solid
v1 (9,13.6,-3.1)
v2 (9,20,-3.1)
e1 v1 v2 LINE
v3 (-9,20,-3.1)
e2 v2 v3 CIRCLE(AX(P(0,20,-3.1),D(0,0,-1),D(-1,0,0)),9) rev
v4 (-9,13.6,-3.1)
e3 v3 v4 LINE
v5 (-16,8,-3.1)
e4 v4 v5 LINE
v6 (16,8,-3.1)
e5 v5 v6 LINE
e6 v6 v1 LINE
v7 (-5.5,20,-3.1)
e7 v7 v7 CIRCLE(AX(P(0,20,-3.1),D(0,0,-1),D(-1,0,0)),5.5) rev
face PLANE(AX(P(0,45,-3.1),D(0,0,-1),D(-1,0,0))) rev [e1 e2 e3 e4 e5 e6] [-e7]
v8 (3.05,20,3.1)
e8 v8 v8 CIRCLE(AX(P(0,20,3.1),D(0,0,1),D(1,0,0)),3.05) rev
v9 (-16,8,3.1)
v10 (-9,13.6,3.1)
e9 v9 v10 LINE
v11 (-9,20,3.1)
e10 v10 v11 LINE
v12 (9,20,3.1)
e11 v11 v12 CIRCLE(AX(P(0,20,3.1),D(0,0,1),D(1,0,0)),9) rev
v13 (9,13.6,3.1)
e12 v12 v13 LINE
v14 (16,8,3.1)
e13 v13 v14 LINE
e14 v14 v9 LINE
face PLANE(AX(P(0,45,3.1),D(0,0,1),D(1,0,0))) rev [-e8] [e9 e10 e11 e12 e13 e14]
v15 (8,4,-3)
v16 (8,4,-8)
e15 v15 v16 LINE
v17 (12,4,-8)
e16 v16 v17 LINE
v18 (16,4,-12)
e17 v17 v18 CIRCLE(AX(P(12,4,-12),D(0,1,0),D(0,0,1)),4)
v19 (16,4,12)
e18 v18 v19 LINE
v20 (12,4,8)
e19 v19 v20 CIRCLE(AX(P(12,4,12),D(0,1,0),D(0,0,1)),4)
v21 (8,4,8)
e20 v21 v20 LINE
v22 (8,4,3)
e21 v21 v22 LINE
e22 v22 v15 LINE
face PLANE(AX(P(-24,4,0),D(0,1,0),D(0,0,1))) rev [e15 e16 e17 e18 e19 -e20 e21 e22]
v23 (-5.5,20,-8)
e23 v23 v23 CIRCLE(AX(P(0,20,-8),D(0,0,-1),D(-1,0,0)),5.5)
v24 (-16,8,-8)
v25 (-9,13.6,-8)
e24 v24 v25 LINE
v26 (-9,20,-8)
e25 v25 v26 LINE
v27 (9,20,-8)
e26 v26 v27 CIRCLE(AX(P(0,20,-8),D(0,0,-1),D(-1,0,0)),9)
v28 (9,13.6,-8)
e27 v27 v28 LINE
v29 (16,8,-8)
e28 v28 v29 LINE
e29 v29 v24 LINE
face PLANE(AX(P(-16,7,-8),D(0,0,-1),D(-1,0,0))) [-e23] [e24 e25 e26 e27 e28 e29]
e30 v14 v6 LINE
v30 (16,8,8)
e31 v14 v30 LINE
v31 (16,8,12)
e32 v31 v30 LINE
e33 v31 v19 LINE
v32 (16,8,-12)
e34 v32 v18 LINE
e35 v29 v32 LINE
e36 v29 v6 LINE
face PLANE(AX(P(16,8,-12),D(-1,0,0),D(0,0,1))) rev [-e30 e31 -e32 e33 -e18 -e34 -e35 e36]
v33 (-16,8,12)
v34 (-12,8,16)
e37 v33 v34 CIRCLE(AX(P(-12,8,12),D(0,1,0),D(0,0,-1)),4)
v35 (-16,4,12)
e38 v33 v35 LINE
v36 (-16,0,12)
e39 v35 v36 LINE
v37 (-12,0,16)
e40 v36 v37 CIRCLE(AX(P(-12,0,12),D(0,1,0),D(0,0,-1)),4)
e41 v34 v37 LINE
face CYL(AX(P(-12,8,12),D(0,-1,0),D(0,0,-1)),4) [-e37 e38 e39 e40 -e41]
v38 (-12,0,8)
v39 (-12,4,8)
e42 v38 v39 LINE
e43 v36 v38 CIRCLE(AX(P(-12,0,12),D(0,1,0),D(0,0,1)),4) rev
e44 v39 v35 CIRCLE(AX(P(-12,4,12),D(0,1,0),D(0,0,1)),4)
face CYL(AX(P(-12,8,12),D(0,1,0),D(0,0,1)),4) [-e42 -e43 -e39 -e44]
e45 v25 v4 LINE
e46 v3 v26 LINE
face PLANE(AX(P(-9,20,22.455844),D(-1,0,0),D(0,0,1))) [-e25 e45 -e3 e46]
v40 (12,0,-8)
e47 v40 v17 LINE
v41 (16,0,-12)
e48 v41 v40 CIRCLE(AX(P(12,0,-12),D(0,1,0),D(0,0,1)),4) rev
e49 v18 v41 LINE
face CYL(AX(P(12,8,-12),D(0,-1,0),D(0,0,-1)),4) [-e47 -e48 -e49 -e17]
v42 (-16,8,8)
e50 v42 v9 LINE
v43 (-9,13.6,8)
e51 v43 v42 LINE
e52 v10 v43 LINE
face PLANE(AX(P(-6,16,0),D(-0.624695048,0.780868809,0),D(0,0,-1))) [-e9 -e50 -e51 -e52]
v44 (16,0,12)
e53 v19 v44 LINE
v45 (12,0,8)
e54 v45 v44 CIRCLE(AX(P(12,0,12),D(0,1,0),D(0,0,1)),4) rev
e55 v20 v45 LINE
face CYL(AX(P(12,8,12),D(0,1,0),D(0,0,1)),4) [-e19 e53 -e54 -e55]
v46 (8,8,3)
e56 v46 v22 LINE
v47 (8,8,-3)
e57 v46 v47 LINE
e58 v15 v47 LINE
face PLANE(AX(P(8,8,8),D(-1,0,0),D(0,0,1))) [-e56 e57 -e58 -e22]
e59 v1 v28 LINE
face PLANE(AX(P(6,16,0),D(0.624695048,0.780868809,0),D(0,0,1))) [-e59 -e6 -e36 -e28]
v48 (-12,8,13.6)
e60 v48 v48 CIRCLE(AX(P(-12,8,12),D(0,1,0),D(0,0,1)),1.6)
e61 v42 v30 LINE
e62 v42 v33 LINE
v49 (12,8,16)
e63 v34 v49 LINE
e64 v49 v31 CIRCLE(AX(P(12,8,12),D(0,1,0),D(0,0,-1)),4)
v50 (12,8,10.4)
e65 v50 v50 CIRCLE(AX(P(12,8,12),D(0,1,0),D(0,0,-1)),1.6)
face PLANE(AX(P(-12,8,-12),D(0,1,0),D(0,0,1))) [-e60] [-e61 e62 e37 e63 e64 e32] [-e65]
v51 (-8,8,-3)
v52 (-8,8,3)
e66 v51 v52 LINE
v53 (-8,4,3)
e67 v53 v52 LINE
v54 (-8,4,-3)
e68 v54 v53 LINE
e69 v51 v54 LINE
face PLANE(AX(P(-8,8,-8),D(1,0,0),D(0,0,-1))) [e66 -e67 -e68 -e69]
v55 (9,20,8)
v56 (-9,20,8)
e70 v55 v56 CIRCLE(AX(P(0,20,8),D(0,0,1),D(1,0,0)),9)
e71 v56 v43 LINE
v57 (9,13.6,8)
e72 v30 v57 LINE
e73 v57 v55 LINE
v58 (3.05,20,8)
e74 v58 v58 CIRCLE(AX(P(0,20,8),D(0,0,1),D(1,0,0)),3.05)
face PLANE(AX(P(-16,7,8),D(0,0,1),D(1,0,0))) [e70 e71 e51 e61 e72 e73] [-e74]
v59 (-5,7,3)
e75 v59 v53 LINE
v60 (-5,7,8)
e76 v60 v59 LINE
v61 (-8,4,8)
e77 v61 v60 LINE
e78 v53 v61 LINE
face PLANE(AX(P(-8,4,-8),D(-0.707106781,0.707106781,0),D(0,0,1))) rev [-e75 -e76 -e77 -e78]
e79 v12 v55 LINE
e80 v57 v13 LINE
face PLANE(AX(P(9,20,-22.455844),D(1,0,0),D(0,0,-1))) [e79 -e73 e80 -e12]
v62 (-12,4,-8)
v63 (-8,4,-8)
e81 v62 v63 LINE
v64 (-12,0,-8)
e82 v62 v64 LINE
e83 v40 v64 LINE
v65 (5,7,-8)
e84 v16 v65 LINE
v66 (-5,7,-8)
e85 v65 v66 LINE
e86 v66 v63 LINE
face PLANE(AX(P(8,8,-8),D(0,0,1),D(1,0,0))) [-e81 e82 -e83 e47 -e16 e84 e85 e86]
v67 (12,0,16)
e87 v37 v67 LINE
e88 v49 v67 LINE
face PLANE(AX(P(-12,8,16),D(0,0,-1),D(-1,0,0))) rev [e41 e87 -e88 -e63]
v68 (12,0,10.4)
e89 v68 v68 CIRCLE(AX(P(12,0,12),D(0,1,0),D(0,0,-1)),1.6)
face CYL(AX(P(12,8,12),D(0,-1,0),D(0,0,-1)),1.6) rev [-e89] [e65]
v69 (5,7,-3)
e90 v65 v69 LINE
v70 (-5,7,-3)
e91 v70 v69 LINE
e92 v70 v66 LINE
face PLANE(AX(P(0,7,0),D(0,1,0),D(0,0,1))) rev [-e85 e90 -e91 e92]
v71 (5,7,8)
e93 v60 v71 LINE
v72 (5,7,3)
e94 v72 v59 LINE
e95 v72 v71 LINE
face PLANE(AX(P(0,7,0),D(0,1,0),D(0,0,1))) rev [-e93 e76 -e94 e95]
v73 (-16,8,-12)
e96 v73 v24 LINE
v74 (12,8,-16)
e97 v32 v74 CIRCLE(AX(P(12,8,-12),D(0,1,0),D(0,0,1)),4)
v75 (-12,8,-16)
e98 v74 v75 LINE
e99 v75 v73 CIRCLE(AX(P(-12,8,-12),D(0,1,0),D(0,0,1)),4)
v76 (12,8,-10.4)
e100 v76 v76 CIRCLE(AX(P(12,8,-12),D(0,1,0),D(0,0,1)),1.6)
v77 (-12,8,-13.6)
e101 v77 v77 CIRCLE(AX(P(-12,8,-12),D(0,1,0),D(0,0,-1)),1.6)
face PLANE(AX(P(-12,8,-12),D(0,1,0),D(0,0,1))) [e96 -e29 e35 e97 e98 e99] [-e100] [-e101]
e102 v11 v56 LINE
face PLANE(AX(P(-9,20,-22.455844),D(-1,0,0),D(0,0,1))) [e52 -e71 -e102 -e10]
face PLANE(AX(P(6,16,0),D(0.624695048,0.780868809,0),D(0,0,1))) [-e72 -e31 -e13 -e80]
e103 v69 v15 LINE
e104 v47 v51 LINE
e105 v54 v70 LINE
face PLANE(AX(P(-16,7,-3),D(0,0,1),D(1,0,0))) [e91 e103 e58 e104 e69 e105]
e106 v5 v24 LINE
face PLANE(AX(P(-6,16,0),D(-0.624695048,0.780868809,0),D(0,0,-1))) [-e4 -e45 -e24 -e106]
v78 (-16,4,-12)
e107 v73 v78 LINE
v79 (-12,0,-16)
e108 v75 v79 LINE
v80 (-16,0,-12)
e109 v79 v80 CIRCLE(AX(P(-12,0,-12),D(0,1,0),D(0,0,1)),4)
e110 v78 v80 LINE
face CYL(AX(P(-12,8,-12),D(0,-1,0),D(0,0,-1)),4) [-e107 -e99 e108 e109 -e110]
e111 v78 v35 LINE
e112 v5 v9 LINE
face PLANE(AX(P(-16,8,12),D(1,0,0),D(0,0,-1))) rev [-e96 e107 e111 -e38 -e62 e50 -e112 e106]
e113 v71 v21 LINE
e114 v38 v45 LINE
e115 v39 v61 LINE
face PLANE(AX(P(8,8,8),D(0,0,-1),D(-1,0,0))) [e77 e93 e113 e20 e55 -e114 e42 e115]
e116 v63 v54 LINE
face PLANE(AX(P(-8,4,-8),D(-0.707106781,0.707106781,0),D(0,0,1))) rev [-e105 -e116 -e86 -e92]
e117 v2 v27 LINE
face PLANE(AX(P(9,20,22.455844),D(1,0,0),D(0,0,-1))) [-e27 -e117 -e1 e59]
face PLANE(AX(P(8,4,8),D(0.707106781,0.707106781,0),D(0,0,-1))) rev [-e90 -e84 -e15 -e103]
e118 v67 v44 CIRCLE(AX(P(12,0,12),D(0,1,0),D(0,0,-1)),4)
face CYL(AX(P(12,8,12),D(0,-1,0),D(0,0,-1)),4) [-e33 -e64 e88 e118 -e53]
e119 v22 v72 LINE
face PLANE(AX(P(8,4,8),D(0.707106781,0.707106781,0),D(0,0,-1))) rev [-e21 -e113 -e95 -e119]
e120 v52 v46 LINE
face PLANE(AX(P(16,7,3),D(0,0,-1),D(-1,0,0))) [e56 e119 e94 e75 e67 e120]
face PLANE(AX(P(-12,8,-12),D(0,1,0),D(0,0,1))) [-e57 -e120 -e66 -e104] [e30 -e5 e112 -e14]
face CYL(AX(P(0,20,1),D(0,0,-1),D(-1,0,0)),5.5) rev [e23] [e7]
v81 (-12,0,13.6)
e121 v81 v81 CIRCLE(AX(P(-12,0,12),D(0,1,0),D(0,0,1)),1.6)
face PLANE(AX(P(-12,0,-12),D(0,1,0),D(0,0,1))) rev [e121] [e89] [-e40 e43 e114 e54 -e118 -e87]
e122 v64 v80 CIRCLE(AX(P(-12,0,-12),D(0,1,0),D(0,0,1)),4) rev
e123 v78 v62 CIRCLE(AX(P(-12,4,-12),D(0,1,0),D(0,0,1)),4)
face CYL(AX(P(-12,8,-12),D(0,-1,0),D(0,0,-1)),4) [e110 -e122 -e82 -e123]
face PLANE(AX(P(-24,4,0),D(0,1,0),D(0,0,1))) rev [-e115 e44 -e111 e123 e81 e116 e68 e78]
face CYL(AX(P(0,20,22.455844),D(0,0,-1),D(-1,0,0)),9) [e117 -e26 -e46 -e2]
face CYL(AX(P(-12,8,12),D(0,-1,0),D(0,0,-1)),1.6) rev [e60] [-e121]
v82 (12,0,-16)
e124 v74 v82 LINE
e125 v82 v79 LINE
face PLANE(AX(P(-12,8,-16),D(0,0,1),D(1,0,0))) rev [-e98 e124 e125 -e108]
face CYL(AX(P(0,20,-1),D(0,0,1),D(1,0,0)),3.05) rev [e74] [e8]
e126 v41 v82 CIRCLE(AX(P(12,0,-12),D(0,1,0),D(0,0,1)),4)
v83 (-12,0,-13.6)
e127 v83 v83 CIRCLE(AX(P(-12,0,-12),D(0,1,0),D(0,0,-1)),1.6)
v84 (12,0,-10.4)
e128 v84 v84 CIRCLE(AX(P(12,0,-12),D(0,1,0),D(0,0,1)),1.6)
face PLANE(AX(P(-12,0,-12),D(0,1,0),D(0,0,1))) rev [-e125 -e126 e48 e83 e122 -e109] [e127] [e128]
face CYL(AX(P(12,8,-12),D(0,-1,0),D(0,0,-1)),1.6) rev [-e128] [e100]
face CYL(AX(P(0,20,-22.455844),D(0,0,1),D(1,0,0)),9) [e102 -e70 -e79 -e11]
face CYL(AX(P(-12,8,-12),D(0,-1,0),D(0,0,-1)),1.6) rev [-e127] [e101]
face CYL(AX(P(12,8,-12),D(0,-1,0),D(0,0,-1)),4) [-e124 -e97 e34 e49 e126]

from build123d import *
from OCP.BRepFilletAPI import BRepFilletAPI_MakeChamfer

# Parameters (mm, degrees)
SKETCH1_R                = 1.6
SKETCH1_W                = 16
SKETCH1_H                = 16
BOSS_EXTRUDE1_DEPTH      = 8
SKETCH2_W                = 16
SKETCH2_H                = 4
CUT_EXTRUDE1_DEPTH       = 40
FILLET1_R                = 4
BOSS_EXTRUDE5_DEPTH      = 8
BOSS_EXTRUDE5_DEPTH_BACK = 1
SKETCH3_W                = 32
SKETCH3_H                = 5
CHAMFER1_SIZE            = 3
CHAMFER2_SIZE            = 8
CHAMFER2_SIZE2           = 10
SKETCH5_W                = 12
SKETCH5_H                = 5
BOSS_EXTRUDE7_DEPTH      = 8
FILLET2_R                = 4
SKETCH6_R                = 1.6
CUT_EXTRUDE2_DEPTH       = 20
SKETCH7_R                = 3.05
CUT_EXTRUDE3_DEPTH       = 9
SKETCH8_R                = 3.05
BOSS_EXTRUDE8_DEPTH      = 5
BOSS_EXTRUDE9_START      = -5
SKETCH9_R                = 1.6
BOSS_EXTRUDE9_DEPTH      = 5
SKETCH10_R               = 5.5
CUT_EXTRUDE4_DEPTH       = 9
CUT_EXTRUDE5_DEPTH       = 37


with BuildPart() as part:
    # Sketch1 → Boss-Extrude1 (new body)
    with BuildSketch(Plane(origin=(0, 0, 0), x_dir=(1, 0, 0), z_dir=(0, 1, 0))):
        with BuildLine():
            Line((-12, 16), (12, 16))
            ThreePointArc((12, 16), (14.828427125, 14.828427125), (16, 12))
            Line((16, 12), (16, -12))
            ThreePointArc((16, -12), (14.828427125, -14.828427125), (12, -16))
            Line((12, -16), (-12, -16))
            ThreePointArc((-12, -16), (-14.828427125, -14.828427125), (-16, -12))
            Line((-16, -12), (-16, 12))
            ThreePointArc((-16, 12), (-14.828427125, 14.828427125), (-12, 16))
        make_face()
        with Locations(Location((12, 12, 0), (0, 0, 270))):
            Circle(SKETCH1_R, mode=Mode.SUBTRACT)
        with Locations(Location((-12, 12, 0), (0, 0, 90))):
            Circle(SKETCH1_R, mode=Mode.SUBTRACT)
        with Locations(Location((12, -12, 0), (0, 0, 90))):
            Circle(SKETCH1_R, mode=Mode.SUBTRACT)
        with Locations(Location((-12, -12, 0), (0, 0, 270))):
            Circle(SKETCH1_R, mode=Mode.SUBTRACT)
        Rectangle(SKETCH1_W, SKETCH1_H, mode=Mode.SUBTRACT)
    extrude(amount=BOSS_EXTRUDE1_DEPTH)

    # Sketch2 → Cut-Extrude1 (cut)
    with BuildSketch(Plane(origin=(16, 0, 0), x_dir=(0, 0, -1), z_dir=(1, 0, 0))):
        with Locations((0, 2)):
            Rectangle(SKETCH2_W, SKETCH2_H)
    extrude(amount=-CUT_EXTRUDE1_DEPTH, mode=Mode.SUBTRACT)

    # Fillet1
    fillet1_edges = [part.edges().sort_by_distance(p)[0] for p in [
        (-16, 2, -8),
        (16, 2, -8),
        (-16, 2, 8),
        (16, 2, 8),
    ]]
    fillet(fillet1_edges, radius=FILLET1_R - 0.0001)  # a hair under: the kernel refuses the full size

    # Sketch3 → Boss-Extrude5 (add, two sides: drawn at the far end of the back side and taken through both)
    with BuildSketch(Plane(origin=(0, 8, 0), x_dir=(1, 0, 0), z_dir=(0, 1, 0)).offset(-BOSS_EXTRUDE5_DEPTH_BACK)):
        with Locations((0, 5.5)):
            Rectangle(SKETCH3_W, SKETCH3_H)
        with Locations((0, -5.5)):
            Rectangle(SKETCH3_W, SKETCH3_H)
    extrude(amount=BOSS_EXTRUDE5_DEPTH + BOSS_EXTRUDE5_DEPTH_BACK)

    # Chamfer1
    chamfer1_edges = [part.edges().sort_by_distance(p)[0] for p in [
        (8, 7, 5.5),
        (8, 7, -5.5),
        (-8, 7, -5.5),
        (-8, 7, 5.5),
    ]]
    chamfer(chamfer1_edges, length=CHAMFER1_SIZE - 0.0001)  # a hair under: the kernel refuses the full size

    # Chamfer2: one chamfer whose edges measure the first distance from different faces: ONE call of the kernel's chamfer builder (chamfer() names one face for all edges)
    chamfer2_edges_1 = [part.edges().sort_by_distance(p)[0] for p in [
        (16, 16, -5.5),
        (16, 16, 5.5),
    ]]
    chamfer2_side_1 = [part.faces().sort_by_distance(p)[0] for p in [
        (16, 0.288444102, -11.99995),
    ]]
    chamfer2_edges_2 = [part.edges().sort_by_distance(p)[0] for p in [
        (-16, 16, -5.5),
        (-16, 16, 5.5),
    ]]
    chamfer2_side_2 = [part.faces().sort_by_distance(p)[0] for p in [
        (-16, 0.288444102, 11.99995),
    ]]
    chamfer2 = BRepFilletAPI_MakeChamfer(part.part.solid().wrapped)
    for e in chamfer2_edges_1:
        chamfer2.Add(CHAMFER2_SIZE, CHAMFER2_SIZE2, e.wrapped, chamfer2_side_1[0].wrapped)  # the first distance lies on this face
    for e in chamfer2_edges_2:
        chamfer2.Add(CHAMFER2_SIZE, CHAMFER2_SIZE2, e.wrapped, chamfer2_side_2[0].wrapped)  # the first distance lies on this face
    add(Compound.cast(chamfer2.Shape()), mode=Mode.REPLACE)

    # Sketch5 → Boss-Extrude7 (add)
    with BuildSketch(Plane(origin=(0, 16, 0), x_dir=(1, 0, 0), z_dir=(0, 1, 0))):
        with Locations((0, 5.5)):
            Rectangle(SKETCH5_W, SKETCH5_H)
        with Locations((0, -5.5)):
            Rectangle(SKETCH5_W, SKETCH5_H)
    extrude(amount=BOSS_EXTRUDE7_DEPTH)

    # Fillet2
    fillet2_edges = [part.edges().sort_by_distance(p)[0] for p in [
        (-6, 24, -5.5),
        (6, 24, -5.5),
        (-6, 24, 5.5),
        (6, 24, 5.5),
    ]]
    fillet(fillet2_edges, radius=FILLET2_R)

    # Sketch6 → Cut-Extrude2 (cut)
    with BuildSketch(Plane.XY.offset(8)):
        with Locations((0, 20)):
            Circle(SKETCH6_R)
    extrude(amount=-CUT_EXTRUDE2_DEPTH, mode=Mode.SUBTRACT)

    # Sketch7 → Cut-Extrude3 (cut)
    with BuildSketch(Plane.XY.offset(8)):
        with Locations((0, 20)):
            Circle(SKETCH7_R)
    extrude(amount=-CUT_EXTRUDE3_DEPTH, mode=Mode.SUBTRACT)

    # Sketch8 → Boss-Extrude8 (add)
    with BuildSketch(Plane.XY.offset(8)):
        with BuildLine():
            Line((-9, 20), (-9, 11))
            Line((-9, 11), (0, 11))
            Line((0, 11), (9, 11))
            Line((9, 11), (9, 20))
            ThreePointArc((9, 20), (0, 29), (-9, 20))
        make_face()
        with Locations((0, 20)):
            Circle(SKETCH8_R, mode=Mode.SUBTRACT)
    extrude(amount=-BOSS_EXTRUDE8_DEPTH)

    # Sketch9 → Boss-Extrude9 (add)
    with BuildSketch(Plane(origin=(0, 0, -8), x_dir=(-1, 0, 0), z_dir=(0, 0, -1)).offset(BOSS_EXTRUDE9_START)):
        with BuildLine():
            Line((-9, 20), (-9, 11))
            Line((-9, 11), (9, 11))
            Line((9, 11), (9, 20))
            ThreePointArc((9, 20), (0, 29), (-9, 20))
        make_face()
        with Locations(Location((0, 20, 0), (0, 0, 180))):
            Circle(SKETCH9_R, mode=Mode.SUBTRACT)
    extrude(amount=BOSS_EXTRUDE9_DEPTH)

    # Sketch10 → Cut-Extrude4 (cut)
    with BuildSketch(Plane(origin=(0, 0, -8), x_dir=(-1, 0, 0), z_dir=(0, 0, -1))):
        with Locations((0, 20)):
            Circle(SKETCH10_R)
    extrude(amount=-CUT_EXTRUDE4_DEPTH, mode=Mode.SUBTRACT)

    # Sketch11 → Cut-Extrude5 (cut)
    with BuildSketch(Plane(origin=(0, 8, 0), x_dir=(1, 0, 0), z_dir=(0, 1, 0))):
        Polygon((0, 3.1), (23.961552098, 3.1), (23.961552098, -3.1), (0, -3.1), (-29.391122595, -3.1), (-29.391122595, 3.1), align=None)
    extrude(amount=CUT_EXTRUDE5_DEPTH, mode=Mode.SUBTRACT)


solid = part.part
